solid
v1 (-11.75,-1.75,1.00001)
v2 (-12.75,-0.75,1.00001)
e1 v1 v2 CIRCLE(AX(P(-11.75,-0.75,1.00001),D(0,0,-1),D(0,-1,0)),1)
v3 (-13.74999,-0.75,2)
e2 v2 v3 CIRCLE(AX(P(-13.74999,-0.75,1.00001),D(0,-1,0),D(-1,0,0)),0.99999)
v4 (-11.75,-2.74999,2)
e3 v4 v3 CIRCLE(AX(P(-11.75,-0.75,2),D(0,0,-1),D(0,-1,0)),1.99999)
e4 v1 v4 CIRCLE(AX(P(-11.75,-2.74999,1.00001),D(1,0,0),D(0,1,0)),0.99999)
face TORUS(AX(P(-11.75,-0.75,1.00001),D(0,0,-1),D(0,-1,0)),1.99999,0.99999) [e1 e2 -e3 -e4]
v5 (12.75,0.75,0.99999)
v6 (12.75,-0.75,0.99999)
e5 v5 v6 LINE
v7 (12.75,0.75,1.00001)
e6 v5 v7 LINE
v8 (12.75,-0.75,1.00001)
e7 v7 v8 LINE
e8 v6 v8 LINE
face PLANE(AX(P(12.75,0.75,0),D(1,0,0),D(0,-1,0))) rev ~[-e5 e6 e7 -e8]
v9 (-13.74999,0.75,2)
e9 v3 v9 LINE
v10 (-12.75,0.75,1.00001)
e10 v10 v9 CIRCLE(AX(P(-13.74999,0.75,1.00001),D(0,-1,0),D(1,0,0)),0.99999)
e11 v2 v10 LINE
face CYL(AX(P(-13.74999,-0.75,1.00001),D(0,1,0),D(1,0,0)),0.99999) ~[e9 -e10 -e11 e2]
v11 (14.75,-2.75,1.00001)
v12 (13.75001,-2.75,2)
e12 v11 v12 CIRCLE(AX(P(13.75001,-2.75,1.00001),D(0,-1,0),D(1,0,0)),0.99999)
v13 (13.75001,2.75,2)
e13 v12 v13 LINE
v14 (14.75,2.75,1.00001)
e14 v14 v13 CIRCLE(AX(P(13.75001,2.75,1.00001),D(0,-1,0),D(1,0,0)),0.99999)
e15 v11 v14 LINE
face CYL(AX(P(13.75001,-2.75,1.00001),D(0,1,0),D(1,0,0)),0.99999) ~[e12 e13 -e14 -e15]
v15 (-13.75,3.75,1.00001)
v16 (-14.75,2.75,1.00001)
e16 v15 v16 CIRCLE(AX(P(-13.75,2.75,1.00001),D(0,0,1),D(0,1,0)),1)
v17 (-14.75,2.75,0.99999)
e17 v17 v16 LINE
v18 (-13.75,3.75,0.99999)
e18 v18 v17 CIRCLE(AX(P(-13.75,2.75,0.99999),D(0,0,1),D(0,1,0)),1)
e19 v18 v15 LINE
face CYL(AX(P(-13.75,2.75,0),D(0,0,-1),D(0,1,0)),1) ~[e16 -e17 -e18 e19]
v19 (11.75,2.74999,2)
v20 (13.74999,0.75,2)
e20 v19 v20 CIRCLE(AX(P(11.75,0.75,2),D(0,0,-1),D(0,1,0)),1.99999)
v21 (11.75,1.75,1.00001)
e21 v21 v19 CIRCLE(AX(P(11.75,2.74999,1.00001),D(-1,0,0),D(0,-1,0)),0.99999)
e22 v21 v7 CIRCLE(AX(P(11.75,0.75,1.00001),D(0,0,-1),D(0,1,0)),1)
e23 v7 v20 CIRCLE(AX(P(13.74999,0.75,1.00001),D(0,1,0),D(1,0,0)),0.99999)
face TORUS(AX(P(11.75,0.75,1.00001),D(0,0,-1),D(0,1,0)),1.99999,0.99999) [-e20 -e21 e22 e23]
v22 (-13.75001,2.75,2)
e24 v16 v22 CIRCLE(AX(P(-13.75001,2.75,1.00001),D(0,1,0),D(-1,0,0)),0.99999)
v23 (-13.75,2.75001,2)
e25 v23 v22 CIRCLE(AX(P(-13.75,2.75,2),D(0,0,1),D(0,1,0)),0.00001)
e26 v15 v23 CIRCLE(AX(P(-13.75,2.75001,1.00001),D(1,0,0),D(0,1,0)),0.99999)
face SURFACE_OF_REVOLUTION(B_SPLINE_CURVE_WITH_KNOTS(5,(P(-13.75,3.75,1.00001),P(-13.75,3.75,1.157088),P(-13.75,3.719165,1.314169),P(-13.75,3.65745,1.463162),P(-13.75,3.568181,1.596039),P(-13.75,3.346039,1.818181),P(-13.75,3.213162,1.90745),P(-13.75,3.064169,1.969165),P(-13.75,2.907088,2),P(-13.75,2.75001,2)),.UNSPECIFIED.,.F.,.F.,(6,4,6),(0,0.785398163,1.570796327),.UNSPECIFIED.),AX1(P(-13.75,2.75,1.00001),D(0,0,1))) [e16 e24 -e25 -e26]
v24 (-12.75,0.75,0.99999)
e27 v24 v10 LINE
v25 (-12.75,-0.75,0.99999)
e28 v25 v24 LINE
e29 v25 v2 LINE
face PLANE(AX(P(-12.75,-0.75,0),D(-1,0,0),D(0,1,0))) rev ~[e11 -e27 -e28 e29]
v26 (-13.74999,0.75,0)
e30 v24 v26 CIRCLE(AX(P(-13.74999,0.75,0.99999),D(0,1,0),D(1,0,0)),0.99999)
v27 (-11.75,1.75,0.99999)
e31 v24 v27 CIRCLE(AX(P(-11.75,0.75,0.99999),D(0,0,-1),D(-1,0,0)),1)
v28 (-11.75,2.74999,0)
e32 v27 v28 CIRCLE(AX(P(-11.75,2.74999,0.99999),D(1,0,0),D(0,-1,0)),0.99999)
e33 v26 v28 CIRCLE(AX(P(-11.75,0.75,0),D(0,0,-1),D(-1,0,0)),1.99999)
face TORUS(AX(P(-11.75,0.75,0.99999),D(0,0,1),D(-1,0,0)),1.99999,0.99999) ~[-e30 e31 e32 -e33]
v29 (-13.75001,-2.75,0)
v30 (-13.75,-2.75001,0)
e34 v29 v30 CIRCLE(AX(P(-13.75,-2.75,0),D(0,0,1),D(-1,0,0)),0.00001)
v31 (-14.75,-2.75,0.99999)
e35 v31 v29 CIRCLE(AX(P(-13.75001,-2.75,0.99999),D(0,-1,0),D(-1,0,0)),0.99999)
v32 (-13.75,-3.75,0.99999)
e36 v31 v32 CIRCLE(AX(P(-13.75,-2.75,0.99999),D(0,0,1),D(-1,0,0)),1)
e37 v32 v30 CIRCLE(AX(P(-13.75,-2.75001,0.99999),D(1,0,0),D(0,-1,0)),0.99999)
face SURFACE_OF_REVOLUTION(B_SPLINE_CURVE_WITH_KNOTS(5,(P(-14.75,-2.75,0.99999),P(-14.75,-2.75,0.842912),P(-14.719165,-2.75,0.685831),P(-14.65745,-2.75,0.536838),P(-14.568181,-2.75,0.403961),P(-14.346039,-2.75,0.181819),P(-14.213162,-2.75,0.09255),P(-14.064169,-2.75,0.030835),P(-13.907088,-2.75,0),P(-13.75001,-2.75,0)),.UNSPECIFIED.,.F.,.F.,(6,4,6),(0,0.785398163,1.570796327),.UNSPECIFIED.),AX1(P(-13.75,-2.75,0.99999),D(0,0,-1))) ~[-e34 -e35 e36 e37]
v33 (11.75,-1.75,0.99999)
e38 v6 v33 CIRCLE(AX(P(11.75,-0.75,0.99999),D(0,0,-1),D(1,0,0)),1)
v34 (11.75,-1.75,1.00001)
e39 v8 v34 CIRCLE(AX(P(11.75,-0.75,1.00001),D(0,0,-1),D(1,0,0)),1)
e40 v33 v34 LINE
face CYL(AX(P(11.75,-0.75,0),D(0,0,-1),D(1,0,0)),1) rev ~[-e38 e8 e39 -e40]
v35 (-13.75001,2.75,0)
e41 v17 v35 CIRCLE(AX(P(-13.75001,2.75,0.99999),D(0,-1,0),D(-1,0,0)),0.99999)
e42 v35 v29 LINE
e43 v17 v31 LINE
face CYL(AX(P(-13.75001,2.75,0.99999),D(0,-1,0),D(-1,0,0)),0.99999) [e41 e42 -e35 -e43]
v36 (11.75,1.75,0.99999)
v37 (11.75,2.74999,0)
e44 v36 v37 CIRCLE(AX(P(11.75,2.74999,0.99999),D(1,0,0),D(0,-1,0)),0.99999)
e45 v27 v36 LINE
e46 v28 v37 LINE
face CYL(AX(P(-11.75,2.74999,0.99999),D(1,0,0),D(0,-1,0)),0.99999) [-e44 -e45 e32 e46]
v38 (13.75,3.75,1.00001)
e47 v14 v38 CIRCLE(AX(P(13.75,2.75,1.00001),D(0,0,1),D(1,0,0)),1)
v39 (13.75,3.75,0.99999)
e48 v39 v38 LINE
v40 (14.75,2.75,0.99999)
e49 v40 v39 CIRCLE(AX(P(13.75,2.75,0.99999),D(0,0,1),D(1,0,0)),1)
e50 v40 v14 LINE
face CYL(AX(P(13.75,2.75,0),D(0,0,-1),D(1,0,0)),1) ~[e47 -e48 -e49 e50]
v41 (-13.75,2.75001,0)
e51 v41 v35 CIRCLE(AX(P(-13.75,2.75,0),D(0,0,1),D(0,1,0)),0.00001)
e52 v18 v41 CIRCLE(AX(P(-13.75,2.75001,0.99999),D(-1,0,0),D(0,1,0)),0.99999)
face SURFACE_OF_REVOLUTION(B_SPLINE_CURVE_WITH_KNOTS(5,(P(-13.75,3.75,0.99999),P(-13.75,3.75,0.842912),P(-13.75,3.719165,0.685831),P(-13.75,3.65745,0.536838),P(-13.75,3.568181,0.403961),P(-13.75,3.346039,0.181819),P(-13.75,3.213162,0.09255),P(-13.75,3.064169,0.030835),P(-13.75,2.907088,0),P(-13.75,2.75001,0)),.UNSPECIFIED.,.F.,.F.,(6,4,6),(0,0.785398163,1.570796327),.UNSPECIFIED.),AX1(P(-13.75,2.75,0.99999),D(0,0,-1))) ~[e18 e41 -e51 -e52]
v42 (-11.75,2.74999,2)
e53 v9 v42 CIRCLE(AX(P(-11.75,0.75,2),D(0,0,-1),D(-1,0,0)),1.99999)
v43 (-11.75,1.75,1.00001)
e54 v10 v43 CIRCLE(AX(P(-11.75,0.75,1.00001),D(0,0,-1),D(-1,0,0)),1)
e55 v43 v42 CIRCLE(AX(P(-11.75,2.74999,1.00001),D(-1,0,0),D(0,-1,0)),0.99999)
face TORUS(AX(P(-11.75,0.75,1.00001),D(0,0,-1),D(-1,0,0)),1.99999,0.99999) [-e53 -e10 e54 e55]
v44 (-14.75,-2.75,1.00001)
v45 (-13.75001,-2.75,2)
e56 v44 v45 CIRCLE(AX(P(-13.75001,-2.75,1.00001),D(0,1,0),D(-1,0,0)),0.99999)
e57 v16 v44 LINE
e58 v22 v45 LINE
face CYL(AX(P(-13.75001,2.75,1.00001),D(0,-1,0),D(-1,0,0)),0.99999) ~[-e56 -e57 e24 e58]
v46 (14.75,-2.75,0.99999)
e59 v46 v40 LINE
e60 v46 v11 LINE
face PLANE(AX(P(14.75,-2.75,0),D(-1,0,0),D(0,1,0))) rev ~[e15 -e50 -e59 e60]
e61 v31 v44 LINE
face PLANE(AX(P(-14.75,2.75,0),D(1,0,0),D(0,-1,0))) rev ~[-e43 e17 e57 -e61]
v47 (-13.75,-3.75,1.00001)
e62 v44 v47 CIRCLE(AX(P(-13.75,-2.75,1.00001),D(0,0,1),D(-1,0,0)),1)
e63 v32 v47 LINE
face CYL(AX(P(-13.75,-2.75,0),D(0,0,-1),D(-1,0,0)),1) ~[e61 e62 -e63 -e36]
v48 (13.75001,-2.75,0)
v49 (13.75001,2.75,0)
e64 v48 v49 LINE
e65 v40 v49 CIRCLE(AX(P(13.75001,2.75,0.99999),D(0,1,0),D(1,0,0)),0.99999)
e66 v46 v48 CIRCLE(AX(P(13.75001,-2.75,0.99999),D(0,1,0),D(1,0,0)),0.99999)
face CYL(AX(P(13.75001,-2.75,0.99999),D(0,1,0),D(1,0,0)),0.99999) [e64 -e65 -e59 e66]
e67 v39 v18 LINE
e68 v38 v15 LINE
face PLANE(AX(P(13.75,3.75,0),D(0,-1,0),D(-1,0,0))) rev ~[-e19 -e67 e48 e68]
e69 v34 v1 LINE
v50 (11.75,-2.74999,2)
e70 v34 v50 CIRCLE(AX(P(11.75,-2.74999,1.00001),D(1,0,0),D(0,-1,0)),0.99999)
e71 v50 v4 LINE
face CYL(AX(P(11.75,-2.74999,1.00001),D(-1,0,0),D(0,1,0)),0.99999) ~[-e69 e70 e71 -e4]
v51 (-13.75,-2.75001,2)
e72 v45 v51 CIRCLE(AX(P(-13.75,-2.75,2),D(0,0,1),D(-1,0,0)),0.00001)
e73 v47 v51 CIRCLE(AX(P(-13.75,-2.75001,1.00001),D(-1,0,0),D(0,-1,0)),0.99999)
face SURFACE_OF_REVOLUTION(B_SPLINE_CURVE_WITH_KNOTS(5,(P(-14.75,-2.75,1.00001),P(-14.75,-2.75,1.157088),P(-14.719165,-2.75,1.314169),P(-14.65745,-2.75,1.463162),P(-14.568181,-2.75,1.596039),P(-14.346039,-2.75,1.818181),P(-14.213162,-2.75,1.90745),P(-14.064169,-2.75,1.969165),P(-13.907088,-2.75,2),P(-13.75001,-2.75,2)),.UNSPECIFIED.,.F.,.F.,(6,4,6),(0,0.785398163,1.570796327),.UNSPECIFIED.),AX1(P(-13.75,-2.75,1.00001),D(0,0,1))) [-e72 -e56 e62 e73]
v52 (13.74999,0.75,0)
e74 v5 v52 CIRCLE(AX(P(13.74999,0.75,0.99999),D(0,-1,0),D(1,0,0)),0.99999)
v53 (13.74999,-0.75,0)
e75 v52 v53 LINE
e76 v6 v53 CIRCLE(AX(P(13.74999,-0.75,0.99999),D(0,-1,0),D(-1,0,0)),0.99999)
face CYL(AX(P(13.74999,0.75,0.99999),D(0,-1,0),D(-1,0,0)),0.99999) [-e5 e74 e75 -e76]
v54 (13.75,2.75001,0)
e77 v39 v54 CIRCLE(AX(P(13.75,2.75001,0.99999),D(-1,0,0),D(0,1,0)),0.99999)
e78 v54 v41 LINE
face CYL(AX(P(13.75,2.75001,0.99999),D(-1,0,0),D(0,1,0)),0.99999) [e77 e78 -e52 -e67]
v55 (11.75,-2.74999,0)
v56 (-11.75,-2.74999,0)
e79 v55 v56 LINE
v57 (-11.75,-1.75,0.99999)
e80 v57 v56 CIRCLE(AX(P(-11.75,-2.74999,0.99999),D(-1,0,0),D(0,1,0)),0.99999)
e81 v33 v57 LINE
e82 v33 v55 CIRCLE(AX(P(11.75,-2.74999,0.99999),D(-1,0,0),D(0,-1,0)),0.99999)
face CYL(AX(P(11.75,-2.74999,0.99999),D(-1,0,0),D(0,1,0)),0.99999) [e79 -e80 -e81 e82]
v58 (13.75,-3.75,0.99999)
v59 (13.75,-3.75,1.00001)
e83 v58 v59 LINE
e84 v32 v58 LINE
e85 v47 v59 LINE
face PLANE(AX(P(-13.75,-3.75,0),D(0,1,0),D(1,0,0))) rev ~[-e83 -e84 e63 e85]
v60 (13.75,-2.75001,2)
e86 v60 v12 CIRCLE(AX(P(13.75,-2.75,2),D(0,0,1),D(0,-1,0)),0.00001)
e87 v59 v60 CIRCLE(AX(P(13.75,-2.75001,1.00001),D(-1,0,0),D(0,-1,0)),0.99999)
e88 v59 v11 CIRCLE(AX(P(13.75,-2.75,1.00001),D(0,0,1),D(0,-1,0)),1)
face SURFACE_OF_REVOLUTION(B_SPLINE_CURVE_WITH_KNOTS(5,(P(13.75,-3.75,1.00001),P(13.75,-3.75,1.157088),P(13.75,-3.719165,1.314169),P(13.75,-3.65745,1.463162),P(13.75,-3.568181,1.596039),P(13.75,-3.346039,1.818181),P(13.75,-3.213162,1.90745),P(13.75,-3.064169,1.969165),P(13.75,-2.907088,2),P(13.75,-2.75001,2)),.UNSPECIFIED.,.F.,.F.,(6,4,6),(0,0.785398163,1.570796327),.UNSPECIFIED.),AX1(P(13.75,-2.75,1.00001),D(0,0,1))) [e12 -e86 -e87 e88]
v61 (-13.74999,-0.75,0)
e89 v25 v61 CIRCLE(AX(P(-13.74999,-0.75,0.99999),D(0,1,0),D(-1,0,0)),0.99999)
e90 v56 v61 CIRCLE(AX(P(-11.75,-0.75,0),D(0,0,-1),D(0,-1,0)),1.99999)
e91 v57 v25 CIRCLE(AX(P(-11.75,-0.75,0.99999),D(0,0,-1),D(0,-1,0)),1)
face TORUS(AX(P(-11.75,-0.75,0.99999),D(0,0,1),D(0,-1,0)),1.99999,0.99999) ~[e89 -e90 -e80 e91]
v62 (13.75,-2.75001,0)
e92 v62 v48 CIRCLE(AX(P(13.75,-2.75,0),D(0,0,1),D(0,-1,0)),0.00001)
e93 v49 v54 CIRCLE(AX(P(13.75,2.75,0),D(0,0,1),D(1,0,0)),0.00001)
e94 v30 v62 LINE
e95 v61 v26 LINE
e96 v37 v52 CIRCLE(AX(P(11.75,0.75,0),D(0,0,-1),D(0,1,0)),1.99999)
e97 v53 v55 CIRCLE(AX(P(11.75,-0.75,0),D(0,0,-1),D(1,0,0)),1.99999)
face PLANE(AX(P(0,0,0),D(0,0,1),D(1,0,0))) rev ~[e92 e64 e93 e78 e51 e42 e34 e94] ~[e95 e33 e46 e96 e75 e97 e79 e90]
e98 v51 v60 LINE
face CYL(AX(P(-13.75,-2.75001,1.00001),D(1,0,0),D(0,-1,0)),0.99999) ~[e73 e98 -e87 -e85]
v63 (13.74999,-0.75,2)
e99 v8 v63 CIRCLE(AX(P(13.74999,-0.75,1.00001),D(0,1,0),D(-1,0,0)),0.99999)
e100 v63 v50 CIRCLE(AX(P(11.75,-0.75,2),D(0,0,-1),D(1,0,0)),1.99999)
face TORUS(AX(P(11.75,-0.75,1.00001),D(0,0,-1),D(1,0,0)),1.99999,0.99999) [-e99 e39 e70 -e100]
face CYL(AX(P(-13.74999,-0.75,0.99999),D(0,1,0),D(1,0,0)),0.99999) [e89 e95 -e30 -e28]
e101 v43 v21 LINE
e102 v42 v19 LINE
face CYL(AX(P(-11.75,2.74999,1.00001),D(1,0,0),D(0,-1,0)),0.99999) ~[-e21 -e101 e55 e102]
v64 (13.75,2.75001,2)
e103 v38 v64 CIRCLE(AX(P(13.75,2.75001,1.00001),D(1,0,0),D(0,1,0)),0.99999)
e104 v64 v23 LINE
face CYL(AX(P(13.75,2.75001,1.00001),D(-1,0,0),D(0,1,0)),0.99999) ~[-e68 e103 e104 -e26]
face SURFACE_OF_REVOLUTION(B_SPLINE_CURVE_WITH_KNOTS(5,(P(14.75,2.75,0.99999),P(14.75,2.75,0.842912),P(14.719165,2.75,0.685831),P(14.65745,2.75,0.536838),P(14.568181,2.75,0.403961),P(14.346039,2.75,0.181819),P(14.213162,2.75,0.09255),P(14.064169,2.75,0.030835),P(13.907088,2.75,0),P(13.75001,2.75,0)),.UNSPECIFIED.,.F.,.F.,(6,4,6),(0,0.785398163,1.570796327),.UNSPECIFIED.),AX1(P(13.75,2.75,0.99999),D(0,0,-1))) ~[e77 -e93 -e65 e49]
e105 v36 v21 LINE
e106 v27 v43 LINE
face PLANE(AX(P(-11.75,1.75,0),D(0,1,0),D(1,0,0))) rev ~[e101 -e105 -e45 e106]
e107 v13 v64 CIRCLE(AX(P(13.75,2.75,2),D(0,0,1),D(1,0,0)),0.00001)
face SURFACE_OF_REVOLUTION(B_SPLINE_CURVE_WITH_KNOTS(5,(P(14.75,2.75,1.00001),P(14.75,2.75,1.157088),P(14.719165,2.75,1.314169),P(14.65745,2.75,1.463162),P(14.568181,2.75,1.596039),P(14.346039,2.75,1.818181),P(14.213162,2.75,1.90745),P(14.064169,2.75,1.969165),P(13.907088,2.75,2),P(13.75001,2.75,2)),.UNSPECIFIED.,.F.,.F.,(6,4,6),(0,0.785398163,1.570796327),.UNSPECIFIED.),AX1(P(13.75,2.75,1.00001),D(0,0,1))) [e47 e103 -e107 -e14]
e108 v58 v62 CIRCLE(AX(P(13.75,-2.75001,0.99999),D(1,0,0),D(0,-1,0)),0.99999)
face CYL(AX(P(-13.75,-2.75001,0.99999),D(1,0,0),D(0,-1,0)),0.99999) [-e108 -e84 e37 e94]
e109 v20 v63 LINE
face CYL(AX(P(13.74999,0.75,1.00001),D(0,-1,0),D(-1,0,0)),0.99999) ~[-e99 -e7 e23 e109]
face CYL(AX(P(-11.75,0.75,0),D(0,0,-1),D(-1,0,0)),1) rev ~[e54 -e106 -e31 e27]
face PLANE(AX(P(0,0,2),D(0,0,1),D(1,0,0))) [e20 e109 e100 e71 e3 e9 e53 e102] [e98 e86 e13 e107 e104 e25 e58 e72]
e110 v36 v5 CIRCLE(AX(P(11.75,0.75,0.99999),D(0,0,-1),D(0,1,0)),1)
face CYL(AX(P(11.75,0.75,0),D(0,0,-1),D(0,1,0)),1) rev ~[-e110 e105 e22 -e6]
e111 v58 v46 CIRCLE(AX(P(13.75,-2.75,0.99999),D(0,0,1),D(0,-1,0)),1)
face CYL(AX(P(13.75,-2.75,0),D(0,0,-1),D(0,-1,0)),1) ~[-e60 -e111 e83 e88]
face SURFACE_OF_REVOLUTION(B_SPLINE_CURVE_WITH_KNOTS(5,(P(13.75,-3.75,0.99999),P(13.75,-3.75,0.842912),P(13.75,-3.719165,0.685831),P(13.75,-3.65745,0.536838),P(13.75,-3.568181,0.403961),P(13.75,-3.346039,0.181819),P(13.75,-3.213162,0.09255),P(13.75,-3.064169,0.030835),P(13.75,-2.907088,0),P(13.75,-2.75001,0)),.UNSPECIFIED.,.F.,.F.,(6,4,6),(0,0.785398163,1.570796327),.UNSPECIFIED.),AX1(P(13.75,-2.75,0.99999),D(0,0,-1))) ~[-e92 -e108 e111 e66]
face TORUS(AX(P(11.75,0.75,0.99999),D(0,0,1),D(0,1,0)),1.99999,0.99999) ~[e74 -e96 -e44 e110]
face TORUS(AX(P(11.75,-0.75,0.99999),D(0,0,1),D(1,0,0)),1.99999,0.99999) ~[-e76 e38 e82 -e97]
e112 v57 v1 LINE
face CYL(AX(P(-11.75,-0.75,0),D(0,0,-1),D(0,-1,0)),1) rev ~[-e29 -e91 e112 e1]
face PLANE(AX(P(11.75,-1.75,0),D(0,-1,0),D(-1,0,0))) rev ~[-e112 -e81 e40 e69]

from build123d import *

# Parameters (mm, degrees)
F1_DEPTH = 2
F2_R     = 0.99999


# Not quite as in the source:
# - a fillet or chamfer is up to 0.001 mm smaller than in the source, because OpenCascade refuses the exact size


with BuildPart() as f1:
    # F0 (on Top) → F1 (new body)
    with BuildSketch(Plane.XY):
        with BuildLine():
            ThreePointArc((-13.75, 3.75), (-14.4571067812, 3.4571067812), (-14.75, 2.75))
            Line((-14.75, 2.75), (-14.75, -2.75))
            ThreePointArc((-14.75, -2.75), (-14.4571067812, -3.4571067812), (-13.75, -3.75))
            Line((-13.75, -3.75), (13.75, -3.75))
            ThreePointArc((13.75, -3.75), (14.4571067812, -3.4571067812), (14.75, -2.75))
            Line((14.75, -2.75), (14.75, 2.75))
            ThreePointArc((14.75, 2.75), (14.4571067812, 3.4571067812), (13.75, 3.75))
            Line((13.75, 3.75), (-13.75, 3.75))
        make_face()
        with BuildLine():
            Line((-11.75, 1.75), (11.75, 1.75))
            ThreePointArc((11.75, 1.75), (12.4571067812, 1.4571067812), (12.75, 0.75))
            Line((12.75, 0.75), (12.75, -0.75))
            ThreePointArc((12.75, -0.75), (12.4571067812, -1.4571067812), (11.75, -1.75))
            Line((11.75, -1.75), (-11.75, -1.75))
            ThreePointArc((-11.75, -1.75), (-12.4571067812, -1.4571067812), (-12.75, -0.75))
            Line((-12.75, -0.75), (-12.75, 0.75))
            ThreePointArc((-12.75, 0.75), (-12.4571067812, 1.4571067812), (-11.75, 1.75))
        make_face(mode=Mode.SUBTRACT)
    extrude(amount=F1_DEPTH)

    # F2 (radius 1 in the source; OpenCascade refuses exactly that, so slightly less here)
    f2_edges = [f1.edges().sort_by_distance(p)[0] for p in [
        (0, 1.75, 2),
        (0, 1.75, 0),
        (0, 3.75, 0),
        (0, -3.75, 2),
    ]]
    fillet(f2_edges, radius=F2_R)


solid = f1.part
